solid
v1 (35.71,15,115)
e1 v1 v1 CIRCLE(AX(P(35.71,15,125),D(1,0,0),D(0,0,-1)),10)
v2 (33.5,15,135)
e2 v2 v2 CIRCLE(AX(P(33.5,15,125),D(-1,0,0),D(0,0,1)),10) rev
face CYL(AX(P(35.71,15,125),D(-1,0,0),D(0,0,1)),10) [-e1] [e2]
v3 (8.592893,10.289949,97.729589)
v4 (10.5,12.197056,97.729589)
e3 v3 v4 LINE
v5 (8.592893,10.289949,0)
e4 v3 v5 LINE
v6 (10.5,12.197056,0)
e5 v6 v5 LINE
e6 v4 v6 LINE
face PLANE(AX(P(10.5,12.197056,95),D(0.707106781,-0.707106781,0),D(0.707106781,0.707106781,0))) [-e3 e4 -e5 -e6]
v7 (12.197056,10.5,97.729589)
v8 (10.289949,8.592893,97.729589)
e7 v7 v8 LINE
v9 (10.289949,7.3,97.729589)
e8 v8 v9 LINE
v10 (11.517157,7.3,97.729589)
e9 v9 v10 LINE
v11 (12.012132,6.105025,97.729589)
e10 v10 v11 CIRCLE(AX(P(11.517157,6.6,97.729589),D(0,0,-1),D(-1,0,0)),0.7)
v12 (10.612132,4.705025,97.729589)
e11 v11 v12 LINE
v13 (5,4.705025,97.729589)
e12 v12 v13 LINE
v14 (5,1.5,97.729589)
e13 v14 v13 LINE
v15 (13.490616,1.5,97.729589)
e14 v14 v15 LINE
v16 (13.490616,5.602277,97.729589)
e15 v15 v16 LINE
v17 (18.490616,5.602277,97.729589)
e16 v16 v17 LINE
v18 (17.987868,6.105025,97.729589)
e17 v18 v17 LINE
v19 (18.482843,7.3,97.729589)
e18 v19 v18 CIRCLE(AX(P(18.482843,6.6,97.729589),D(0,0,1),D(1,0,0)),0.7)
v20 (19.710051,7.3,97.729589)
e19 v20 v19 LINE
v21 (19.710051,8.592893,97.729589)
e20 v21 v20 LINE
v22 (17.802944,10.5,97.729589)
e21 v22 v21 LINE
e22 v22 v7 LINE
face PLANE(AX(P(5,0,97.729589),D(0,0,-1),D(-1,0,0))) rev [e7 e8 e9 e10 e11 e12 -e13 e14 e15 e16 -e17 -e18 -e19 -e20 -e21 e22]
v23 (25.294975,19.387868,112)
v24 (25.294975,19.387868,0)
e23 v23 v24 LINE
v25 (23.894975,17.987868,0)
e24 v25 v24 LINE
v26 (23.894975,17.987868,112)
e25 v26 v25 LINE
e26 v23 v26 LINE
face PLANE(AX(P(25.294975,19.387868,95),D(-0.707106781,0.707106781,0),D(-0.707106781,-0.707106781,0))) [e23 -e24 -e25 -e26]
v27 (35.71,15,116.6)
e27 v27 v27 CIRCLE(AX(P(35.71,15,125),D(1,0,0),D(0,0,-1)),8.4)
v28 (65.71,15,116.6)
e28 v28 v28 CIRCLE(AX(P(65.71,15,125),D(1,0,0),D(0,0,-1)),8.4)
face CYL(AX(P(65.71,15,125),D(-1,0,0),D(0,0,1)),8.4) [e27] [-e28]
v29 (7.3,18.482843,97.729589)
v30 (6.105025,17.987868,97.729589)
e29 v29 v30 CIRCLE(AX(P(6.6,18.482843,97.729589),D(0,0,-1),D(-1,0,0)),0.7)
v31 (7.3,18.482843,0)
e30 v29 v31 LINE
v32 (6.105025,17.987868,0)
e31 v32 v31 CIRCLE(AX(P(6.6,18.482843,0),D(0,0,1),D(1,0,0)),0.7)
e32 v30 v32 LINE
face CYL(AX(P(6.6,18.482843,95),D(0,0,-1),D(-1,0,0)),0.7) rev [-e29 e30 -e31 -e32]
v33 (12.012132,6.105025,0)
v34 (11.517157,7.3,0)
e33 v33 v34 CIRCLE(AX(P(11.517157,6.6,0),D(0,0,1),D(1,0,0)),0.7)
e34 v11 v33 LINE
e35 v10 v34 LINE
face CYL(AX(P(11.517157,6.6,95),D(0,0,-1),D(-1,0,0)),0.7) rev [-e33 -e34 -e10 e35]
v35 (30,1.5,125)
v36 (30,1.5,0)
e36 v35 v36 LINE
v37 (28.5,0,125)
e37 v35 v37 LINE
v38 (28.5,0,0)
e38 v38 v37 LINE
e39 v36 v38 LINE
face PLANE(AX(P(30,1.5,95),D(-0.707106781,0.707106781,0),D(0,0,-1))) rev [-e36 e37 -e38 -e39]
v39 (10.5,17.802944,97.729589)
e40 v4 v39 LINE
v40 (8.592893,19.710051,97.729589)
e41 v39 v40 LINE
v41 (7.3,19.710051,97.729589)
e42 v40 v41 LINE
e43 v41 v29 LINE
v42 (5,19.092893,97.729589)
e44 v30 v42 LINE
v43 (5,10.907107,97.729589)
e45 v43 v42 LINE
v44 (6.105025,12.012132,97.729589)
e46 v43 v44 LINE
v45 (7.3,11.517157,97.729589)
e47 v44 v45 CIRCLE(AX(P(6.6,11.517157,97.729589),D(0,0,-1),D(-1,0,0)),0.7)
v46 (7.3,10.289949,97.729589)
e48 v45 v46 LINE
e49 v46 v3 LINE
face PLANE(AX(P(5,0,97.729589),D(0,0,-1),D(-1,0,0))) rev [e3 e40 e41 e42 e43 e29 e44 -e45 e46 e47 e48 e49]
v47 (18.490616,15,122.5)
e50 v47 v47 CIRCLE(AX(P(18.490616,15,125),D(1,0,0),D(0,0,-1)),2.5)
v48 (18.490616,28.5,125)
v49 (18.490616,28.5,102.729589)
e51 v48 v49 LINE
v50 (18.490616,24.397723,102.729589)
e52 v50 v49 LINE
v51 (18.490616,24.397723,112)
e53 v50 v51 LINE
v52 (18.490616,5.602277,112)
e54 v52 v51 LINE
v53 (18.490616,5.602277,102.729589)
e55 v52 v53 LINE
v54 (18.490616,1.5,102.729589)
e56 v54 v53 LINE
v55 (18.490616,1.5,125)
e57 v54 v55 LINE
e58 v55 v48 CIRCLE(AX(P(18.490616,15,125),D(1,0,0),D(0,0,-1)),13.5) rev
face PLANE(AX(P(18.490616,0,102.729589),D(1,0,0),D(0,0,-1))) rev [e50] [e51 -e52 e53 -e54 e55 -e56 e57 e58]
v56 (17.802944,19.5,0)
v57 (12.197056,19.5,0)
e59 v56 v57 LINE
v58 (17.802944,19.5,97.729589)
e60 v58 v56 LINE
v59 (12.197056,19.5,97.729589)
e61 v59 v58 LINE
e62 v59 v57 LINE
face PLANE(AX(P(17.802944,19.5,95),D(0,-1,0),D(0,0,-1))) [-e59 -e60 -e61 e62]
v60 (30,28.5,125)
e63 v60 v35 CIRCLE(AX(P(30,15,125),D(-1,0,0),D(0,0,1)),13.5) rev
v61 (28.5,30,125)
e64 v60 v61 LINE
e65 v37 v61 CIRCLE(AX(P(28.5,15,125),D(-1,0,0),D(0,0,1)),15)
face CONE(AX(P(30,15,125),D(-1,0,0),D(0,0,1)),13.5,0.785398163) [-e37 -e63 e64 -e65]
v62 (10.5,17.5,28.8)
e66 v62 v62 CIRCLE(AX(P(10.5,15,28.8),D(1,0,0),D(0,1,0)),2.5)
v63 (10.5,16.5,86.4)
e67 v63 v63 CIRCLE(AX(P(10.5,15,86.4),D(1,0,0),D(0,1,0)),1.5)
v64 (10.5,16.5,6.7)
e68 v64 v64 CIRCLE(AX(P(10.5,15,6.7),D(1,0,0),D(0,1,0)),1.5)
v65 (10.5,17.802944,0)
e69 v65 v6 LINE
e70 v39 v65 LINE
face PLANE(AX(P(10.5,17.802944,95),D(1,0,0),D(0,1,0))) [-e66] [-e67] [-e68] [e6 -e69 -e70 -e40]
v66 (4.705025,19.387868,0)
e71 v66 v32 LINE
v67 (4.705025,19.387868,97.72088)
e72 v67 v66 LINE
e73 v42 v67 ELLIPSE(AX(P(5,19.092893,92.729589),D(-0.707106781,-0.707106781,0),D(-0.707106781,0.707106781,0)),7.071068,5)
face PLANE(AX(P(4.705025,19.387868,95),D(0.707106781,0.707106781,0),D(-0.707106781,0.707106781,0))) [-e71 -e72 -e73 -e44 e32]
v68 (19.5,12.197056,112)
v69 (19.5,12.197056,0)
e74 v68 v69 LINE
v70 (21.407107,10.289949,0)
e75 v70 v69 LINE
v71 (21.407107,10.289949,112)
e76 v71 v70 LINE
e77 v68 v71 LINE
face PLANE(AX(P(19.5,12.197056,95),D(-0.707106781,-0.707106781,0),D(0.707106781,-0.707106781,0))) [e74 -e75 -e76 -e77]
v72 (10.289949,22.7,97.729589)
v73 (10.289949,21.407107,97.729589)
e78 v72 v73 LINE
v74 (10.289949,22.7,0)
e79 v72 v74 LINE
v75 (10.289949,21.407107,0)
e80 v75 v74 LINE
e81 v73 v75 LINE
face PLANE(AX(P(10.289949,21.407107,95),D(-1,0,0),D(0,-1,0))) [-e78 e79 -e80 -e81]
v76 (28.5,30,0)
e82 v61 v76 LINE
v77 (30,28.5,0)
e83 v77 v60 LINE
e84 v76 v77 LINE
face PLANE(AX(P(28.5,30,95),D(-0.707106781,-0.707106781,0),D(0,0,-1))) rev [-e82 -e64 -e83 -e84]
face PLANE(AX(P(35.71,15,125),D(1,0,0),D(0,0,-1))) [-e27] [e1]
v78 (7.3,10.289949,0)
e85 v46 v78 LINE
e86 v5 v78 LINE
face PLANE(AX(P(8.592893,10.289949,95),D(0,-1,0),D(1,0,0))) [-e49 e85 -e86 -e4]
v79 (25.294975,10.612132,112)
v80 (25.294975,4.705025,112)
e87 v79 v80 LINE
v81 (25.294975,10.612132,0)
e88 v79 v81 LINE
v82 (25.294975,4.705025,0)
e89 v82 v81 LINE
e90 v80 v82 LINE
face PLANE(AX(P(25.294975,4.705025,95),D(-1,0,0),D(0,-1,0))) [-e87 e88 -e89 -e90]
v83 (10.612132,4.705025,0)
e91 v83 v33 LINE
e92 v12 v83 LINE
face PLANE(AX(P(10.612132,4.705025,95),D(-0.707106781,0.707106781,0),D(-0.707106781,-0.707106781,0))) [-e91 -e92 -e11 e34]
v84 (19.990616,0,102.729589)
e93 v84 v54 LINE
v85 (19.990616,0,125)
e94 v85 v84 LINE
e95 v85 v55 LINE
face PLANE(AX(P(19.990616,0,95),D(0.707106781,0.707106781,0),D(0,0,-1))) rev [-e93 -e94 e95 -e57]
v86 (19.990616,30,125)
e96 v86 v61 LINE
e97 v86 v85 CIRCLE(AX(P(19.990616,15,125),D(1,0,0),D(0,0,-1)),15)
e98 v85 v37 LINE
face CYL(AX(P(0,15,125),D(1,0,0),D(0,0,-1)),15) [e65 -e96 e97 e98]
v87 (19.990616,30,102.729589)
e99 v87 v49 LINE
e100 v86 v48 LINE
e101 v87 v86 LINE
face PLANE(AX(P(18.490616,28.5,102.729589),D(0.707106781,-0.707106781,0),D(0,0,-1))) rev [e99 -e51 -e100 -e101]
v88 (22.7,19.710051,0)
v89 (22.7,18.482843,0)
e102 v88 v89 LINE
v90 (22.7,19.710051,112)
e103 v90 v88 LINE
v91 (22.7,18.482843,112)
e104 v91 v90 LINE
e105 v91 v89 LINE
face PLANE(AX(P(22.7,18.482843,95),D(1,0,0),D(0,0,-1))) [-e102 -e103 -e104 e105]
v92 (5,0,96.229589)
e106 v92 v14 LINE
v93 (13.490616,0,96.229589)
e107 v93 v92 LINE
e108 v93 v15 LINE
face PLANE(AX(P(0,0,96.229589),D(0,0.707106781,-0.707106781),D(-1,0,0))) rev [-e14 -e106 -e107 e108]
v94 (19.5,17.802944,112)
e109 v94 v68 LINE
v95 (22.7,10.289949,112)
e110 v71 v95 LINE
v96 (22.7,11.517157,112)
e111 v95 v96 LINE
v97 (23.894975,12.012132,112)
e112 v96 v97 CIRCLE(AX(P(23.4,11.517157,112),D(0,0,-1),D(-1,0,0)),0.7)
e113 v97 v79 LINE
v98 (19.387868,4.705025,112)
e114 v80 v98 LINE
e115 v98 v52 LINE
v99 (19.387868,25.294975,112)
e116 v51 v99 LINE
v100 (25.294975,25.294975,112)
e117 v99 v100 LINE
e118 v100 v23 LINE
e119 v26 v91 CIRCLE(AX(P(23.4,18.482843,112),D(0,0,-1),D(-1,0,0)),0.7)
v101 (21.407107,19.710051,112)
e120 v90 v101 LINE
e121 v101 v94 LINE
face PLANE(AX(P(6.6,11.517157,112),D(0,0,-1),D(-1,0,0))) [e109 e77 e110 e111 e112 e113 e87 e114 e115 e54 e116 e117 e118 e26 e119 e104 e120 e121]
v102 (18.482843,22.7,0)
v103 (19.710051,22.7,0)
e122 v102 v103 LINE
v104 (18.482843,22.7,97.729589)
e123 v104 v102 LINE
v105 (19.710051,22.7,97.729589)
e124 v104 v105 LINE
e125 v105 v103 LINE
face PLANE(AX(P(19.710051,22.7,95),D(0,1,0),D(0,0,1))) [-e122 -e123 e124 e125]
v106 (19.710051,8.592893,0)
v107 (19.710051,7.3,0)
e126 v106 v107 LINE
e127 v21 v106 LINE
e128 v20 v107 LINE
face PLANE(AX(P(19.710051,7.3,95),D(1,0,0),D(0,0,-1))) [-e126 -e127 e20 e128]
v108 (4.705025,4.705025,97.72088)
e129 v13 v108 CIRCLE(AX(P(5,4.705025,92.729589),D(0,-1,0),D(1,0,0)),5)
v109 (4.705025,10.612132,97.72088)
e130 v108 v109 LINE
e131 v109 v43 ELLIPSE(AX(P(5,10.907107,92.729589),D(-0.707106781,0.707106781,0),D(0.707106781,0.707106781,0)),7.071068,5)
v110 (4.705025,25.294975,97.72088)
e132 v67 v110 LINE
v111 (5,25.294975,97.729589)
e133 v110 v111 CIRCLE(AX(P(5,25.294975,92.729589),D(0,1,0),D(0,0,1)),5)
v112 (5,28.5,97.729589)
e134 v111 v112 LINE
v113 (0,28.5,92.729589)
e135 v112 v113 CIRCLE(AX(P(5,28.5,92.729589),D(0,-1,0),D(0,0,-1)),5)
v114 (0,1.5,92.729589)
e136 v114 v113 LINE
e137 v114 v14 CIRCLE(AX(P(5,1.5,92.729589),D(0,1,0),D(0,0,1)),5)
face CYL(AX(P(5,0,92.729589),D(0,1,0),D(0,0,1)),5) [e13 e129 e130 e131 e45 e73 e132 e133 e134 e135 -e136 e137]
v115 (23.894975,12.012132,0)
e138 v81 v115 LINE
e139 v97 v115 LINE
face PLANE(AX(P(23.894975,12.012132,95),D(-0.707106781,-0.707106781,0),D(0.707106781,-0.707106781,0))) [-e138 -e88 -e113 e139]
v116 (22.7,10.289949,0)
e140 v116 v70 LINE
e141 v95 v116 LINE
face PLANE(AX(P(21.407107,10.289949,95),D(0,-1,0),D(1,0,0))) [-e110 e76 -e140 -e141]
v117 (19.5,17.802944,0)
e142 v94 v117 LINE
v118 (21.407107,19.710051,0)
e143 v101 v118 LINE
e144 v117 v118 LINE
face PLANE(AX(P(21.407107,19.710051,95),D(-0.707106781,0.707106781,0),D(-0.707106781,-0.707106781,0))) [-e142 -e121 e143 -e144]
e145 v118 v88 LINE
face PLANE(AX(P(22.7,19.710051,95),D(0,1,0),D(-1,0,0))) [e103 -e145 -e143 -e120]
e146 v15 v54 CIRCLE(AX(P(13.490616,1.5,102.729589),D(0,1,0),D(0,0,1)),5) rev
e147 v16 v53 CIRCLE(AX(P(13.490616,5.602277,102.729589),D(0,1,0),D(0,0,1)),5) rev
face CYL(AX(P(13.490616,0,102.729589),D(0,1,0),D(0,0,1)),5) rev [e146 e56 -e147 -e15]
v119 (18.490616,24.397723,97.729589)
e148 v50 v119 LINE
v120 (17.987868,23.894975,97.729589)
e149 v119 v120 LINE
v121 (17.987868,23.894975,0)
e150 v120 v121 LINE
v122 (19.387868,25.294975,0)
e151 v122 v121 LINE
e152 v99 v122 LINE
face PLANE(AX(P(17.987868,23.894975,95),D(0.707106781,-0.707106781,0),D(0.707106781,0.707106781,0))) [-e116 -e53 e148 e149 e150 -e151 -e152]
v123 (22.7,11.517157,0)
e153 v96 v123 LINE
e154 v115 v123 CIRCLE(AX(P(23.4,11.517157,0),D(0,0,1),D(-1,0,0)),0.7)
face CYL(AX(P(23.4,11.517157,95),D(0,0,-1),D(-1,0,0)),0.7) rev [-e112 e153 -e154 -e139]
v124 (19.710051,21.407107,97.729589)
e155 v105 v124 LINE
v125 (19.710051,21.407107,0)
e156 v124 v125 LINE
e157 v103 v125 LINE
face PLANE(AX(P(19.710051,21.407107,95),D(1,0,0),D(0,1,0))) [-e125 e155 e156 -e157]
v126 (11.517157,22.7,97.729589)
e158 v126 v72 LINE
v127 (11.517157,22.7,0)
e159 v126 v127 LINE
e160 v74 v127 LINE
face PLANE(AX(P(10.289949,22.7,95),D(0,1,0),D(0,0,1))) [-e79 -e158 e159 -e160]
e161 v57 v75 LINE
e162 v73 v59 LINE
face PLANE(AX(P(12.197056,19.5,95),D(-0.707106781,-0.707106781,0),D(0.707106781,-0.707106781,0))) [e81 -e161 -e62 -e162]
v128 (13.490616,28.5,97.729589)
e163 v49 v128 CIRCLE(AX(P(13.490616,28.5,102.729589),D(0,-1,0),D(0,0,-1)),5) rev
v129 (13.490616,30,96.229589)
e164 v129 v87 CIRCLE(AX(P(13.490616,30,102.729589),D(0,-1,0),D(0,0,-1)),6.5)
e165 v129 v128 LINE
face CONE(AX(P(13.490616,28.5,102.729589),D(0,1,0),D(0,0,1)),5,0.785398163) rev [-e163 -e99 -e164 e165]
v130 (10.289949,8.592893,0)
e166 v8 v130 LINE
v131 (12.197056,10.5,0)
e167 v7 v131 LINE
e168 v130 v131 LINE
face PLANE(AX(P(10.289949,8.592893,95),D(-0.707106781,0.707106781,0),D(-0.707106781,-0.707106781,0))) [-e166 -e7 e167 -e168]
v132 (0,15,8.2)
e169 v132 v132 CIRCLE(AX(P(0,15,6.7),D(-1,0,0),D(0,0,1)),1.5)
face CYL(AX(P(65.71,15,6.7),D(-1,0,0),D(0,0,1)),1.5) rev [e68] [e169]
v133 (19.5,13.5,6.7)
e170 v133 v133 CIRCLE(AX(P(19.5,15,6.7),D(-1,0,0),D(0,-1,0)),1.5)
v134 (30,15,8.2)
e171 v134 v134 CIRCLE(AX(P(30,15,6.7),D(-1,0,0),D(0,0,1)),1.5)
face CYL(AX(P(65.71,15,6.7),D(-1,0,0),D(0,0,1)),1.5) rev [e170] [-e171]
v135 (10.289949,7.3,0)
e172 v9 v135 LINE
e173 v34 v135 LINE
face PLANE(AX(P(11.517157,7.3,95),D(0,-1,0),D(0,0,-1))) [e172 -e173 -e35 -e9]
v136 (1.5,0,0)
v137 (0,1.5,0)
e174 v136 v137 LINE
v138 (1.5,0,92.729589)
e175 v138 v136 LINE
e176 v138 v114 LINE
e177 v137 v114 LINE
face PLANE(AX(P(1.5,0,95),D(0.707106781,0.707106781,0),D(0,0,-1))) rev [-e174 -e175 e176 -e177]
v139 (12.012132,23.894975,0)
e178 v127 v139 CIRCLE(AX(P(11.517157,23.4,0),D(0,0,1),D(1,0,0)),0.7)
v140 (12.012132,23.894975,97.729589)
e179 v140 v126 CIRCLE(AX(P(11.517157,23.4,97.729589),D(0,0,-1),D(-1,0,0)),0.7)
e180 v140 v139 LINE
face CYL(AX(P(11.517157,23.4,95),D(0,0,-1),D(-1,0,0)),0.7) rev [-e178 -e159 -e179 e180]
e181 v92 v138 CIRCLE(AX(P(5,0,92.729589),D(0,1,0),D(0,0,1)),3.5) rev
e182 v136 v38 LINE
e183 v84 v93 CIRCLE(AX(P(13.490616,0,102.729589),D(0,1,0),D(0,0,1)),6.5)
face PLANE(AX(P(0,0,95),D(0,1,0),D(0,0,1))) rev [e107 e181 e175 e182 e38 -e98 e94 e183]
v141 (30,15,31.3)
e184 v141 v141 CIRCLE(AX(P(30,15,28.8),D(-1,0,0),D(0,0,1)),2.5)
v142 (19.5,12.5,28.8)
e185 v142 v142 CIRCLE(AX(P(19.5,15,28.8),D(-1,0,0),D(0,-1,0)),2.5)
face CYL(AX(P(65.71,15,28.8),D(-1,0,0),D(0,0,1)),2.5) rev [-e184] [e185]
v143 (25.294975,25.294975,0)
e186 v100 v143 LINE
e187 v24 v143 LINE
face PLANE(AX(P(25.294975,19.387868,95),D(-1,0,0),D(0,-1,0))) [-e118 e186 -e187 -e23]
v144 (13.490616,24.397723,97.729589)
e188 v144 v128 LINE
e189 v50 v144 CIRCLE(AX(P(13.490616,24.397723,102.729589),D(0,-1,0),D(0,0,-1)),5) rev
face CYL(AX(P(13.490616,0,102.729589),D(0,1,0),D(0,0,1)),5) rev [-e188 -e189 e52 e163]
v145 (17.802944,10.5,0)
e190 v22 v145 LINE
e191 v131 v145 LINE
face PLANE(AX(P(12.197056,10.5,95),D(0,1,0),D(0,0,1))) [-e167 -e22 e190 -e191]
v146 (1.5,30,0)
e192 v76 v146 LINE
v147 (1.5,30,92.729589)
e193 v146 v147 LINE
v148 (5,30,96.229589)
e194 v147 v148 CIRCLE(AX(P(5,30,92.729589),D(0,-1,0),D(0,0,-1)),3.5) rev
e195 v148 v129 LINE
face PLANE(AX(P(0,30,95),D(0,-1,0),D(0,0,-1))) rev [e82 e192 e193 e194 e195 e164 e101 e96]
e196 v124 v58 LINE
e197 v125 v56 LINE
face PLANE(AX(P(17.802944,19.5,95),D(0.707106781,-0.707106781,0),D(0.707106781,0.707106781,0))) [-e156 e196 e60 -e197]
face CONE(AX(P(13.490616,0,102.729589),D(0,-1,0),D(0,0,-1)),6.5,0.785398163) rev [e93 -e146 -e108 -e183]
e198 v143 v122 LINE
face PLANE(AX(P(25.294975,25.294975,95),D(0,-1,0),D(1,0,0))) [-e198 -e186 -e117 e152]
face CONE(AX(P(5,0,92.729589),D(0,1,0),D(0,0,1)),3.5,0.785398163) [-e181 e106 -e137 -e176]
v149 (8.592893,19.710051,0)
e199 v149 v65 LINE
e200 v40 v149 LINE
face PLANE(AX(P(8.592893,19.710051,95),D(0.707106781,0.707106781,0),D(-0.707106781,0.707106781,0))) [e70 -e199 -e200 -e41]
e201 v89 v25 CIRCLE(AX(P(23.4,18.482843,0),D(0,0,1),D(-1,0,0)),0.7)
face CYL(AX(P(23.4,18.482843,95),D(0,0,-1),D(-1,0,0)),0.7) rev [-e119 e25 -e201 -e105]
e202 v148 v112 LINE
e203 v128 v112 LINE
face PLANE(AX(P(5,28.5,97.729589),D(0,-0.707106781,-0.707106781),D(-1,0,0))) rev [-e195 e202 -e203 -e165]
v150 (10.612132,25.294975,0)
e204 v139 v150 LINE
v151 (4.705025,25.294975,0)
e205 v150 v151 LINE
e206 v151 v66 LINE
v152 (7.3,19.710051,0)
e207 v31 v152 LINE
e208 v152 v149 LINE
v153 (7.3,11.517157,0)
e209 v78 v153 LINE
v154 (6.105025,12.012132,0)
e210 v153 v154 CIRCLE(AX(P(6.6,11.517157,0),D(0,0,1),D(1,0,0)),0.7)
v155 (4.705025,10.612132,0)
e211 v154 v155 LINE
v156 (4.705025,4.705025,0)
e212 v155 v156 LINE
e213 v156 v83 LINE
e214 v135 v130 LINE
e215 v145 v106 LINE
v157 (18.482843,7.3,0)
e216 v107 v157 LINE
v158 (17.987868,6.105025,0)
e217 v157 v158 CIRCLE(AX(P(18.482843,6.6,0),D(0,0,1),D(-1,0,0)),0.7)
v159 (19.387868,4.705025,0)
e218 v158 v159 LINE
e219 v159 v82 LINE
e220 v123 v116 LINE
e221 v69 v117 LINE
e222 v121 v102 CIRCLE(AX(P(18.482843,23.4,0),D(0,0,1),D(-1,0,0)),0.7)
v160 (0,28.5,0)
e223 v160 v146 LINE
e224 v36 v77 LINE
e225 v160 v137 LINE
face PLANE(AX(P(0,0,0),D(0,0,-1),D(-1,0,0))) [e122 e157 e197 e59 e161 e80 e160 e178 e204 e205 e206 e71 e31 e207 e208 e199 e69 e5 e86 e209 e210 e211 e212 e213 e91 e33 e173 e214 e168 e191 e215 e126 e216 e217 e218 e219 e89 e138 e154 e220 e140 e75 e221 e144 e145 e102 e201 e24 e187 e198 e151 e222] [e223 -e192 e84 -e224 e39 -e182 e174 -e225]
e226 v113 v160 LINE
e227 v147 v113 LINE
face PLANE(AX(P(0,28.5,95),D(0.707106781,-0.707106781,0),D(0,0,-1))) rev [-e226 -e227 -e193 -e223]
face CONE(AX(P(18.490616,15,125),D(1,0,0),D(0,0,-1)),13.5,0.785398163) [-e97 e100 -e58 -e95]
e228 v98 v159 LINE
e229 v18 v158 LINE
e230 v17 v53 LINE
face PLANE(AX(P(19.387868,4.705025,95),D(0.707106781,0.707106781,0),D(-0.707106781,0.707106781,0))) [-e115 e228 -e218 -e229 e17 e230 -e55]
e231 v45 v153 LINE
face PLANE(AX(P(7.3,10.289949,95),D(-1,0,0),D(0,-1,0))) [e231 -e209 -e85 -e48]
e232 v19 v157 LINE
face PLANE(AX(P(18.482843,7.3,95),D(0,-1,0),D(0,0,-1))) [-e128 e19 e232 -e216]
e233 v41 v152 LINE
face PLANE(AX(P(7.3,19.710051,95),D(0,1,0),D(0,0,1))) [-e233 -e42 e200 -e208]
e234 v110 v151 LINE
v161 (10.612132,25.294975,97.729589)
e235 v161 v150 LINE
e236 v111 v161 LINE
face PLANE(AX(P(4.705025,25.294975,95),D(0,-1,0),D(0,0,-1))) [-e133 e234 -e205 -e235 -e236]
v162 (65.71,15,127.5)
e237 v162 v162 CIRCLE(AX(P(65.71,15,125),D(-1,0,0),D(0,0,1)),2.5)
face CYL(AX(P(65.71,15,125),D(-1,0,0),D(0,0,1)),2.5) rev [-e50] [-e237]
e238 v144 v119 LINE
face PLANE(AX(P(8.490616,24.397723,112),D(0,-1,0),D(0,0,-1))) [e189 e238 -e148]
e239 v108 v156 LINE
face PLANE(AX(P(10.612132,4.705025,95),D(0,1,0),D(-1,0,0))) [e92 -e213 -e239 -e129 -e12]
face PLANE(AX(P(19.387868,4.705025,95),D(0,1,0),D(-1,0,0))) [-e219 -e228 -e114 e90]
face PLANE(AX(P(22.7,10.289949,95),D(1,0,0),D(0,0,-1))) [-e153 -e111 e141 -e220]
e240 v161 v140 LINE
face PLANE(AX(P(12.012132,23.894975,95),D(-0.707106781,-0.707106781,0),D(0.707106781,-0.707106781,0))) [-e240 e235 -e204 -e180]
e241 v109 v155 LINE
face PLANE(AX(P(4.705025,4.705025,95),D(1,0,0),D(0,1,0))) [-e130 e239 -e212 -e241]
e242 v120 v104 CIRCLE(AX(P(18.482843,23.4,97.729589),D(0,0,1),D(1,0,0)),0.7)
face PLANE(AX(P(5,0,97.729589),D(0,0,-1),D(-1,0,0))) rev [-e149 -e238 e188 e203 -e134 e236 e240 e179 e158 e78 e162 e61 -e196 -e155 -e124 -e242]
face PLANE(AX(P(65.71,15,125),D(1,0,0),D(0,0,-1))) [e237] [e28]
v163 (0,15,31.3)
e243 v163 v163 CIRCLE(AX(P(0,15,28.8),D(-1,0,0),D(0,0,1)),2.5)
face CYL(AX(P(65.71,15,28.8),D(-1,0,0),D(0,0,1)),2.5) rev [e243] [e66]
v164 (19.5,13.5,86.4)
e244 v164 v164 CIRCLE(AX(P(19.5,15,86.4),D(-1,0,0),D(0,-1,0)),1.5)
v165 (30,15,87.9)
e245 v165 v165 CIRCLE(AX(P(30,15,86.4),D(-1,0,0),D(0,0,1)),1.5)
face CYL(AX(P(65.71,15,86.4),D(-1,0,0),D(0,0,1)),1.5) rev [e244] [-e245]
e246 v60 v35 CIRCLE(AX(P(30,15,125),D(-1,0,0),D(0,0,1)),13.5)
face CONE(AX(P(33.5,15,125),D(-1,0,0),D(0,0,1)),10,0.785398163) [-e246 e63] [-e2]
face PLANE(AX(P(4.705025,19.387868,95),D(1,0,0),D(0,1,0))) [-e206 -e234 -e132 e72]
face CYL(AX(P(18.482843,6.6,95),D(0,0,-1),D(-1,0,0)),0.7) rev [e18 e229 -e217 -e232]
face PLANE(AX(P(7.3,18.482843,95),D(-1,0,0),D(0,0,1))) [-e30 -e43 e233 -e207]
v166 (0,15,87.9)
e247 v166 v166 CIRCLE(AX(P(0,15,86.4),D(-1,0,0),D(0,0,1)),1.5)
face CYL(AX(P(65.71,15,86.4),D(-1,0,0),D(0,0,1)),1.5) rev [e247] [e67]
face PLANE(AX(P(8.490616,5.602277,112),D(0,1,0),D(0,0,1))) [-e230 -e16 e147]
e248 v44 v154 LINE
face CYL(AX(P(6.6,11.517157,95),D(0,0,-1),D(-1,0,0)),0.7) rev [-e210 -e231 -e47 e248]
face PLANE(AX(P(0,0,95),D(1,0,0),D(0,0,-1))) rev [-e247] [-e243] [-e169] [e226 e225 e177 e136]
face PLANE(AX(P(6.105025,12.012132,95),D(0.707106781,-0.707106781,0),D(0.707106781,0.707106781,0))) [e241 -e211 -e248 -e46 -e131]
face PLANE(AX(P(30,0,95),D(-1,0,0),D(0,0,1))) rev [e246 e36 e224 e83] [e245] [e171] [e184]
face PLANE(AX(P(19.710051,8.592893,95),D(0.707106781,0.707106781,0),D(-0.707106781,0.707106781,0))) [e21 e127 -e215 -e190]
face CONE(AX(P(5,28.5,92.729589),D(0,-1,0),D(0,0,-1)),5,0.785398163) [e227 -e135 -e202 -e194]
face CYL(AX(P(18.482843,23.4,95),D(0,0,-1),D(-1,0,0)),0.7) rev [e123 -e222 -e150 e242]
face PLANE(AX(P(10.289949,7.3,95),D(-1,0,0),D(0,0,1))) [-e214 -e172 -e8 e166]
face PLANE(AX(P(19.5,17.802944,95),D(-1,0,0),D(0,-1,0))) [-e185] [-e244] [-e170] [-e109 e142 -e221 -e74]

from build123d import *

# Parameters (mm, degrees)
SKETCH1_W               = 30
SKETCH1_H               = 30
BOSS_EXTRUDE3_DEPTH     = 95
BOSS_EXTRUDE4_DEPTH     = 30
CUT_EXTRUDE1_DEPTH      = 147.287388383
SKETCH5_R               = 10
BOSS_EXTRUDE5_DEPTH     = 5.71
SKETCH6_R               = 8.4
BOSS_EXTRUDE6_DEPTH     = 30
SKETCH8_R               = 1.5
SKETCH8_R_2             = 2.5
CUT_EXTRUDE2_DEPTH      = 158.536675412
CHAMFER1_SIZE           = 1.5
CHAMFER2_SIZE           = 3.5
CUT_EXTRUDE3_DEPTH      = 17
CUT_EXTRUDE4_DEPTH      = 10
CUT_EXTRUDE4_DEPTH_BACK = 2
SKETCH10_W              = 14.270411079
SKETCH10_H              = 4.897722898


with BuildPart() as part:
    # Sketch1 → Boss-Extrude3 (new body)
    with BuildSketch(Plane.XY):
        with Locations((15, 15)):
            Rectangle(SKETCH1_W, SKETCH1_H)
        with BuildLine():
            Line((17.802943725, 19.5), (12.197056275, 19.5))
            Line((12.197056275, 19.5), (10.289949494, 21.407106781))
            Line((10.289949494, 21.407106781), (10.289949494, 22.7))
            Line((10.289949494, 22.7), (11.517157288, 22.7))
            ThreePointArc((11.517157288, 22.7), (12.16387296, 23.132121597), (12.012132034, 23.894974747))
            Line((12.012132034, 23.894974747), (10.612132034, 25.294974747))
            Line((10.612132034, 25.294974747), (4.705025253, 25.294974747))
            Line((4.705025253, 25.294974747), (4.705025253, 19.387867966))
            Line((4.705025253, 19.387867966), (6.105025253, 17.987867966))
            ThreePointArc((6.105025253, 17.987867966), (6.867878403, 17.83612704), (7.3, 18.482842712))
            Line((7.3, 18.482842712), (7.3, 19.710050506))
            Line((7.3, 19.710050506), (8.592893219, 19.710050506))
            Line((8.592893219, 19.710050506), (10.5, 17.802943725))
            Line((10.5, 17.802943725), (10.5, 12.197056275))
            Line((10.5, 12.197056275), (8.592893219, 10.289949494))
            Line((8.592893219, 10.289949494), (7.3, 10.289949494))
            Line((7.3, 10.289949494), (7.3, 11.517157288))
            ThreePointArc((7.3, 11.517157288), (6.867878403, 12.16387296), (6.105025253, 12.012132034))
            Line((6.105025253, 12.012132034), (4.705025253, 10.612132034))
            Line((4.705025253, 10.612132034), (4.705025253, 4.705025253))
            Line((4.705025253, 4.705025253), (10.612132034, 4.705025253))
            Line((10.612132034, 4.705025253), (12.012132034, 6.105025253))
            ThreePointArc((12.012132034, 6.105025253), (12.16387296, 6.867878403), (11.517157288, 7.3))
            Line((11.517157288, 7.3), (10.289949494, 7.3))
            Line((10.289949494, 7.3), (10.289949494, 8.592893219))
            Line((10.289949494, 8.592893219), (12.197056275, 10.5))
            Line((12.197056275, 10.5), (17.802943725, 10.5))
            Line((17.802943725, 10.5), (19.710050506, 8.592893219))
            Line((19.710050506, 8.592893219), (19.710050506, 7.3))
            Line((19.710050506, 7.3), (18.482842712, 7.3))
            ThreePointArc((18.482842712, 7.3), (17.83612704, 6.867878403), (17.987867966, 6.105025253))
            Line((17.987867966, 6.105025253), (19.387867966, 4.705025253))
            Line((19.387867966, 4.705025253), (25.294974747, 4.705025253))
            Line((25.294974747, 4.705025253), (25.294974747, 10.612132034))
            Line((25.294974747, 10.612132034), (23.894974747, 12.012132034))
            ThreePointArc((23.894974747, 12.012132034), (23.132121597, 12.16387296), (22.7, 11.517157288))
            Line((22.7, 11.517157288), (22.7, 10.289949494))
            Line((22.7, 10.289949494), (21.407106781, 10.289949494))
            Line((21.407106781, 10.289949494), (19.5, 12.197056275))
            Line((19.5, 12.197056275), (19.5, 17.802943725))
            Line((19.5, 17.802943725), (21.407106781, 19.710050506))
            Line((21.407106781, 19.710050506), (22.7, 19.710050506))
            Line((22.7, 19.710050506), (22.7, 18.482842712))
            ThreePointArc((22.7, 18.482842712), (23.132121597, 17.83612704), (23.894974747, 17.987867966))
            Line((23.894974747, 17.987867966), (25.294974747, 19.387867966))
            Line((25.294974747, 19.387867966), (25.294974747, 25.294974747))
            Line((25.294974747, 25.294974747), (19.387867966, 25.294974747))
            Line((19.387867966, 25.294974747), (17.987867966, 23.894974747))
            ThreePointArc((17.987867966, 23.894974747), (17.83612704, 23.132121597), (18.482842712, 22.7))
            Line((18.482842712, 22.7), (19.710050506, 22.7))
            Line((19.710050506, 22.7), (19.710050506, 21.407106781))
            Line((19.710050506, 21.407106781), (17.802943725, 19.5))
        make_face(mode=Mode.SUBTRACT)
    extrude(amount=BOSS_EXTRUDE3_DEPTH)

    # Sketch3 → Boss-Extrude4 (add)
    with BuildSketch(Plane(origin=(30, 0, 0), x_dir=(0, 0, -1), z_dir=(1, 0, 0))):
        with BuildLine():
            Line((-125, 30), (-95, 30))
            Line((-95, 30), (-95, 0))
            Line((-95, 0), (-125, 0))
            ThreePointArc((-125, 0), (-140, 15), (-125, 30))
        make_face()
    extrude(amount=-BOSS_EXTRUDE4_DEPTH)

    # Sketch4 → Cut-Extrude1 (cut, through all)
    with BuildSketch(Plane(origin=(0, 30, 0), x_dir=(1, 0, 0), z_dir=(0, 1, 0))):
        with BuildLine():
            Line((5, -97.729588921), (13.490616116, -97.729588921))
            ThreePointArc((13.490616116, -97.729588921), (17.026150022, -99.194055015), (18.490616116, -102.729588921))
            Line((18.490616116, -102.729588921), (18.490616116, -140))
            Line((18.490616116, -140), (0, -140))
            Line((0, -140), (0, -92.729588921))
            ThreePointArc((0, -92.729588921), (1.464466094, -96.265122827), (5, -97.729588921))
        make_face()
    extrude(amount=-CUT_EXTRUDE1_DEPTH, mode=Mode.SUBTRACT)

    # Sketch5 → Boss-Extrude5 (add)
    with BuildSketch(Plane(origin=(30, 0, 0), x_dir=(0, 0, -1), z_dir=(1, 0, 0))):
        with Locations(Location((-125, 15, 0), (0, 0, 180))):
            Circle(SKETCH5_R)
    extrude(amount=BOSS_EXTRUDE5_DEPTH)

    # Sketch6 → Boss-Extrude6 (add)
    with BuildSketch(Plane(origin=(35.71, 0, 0), x_dir=(0, 0, -1), z_dir=(1, 0, 0))):
        with Locations((-125, 15)):
            Circle(SKETCH6_R)
    extrude(amount=BOSS_EXTRUDE6_DEPTH)

    # Sketch8 → Cut-Extrude2 (cut, through all)
    with BuildSketch(Plane.ZY):
        with Locations((6.7, 15)):
            Circle(SKETCH8_R)
        with Locations((86.4, 15)):
            Circle(SKETCH8_R)
        with Locations((28.8, 15)):
            Circle(SKETCH8_R_2)
        with Locations((125, 15)):
            Circle(SKETCH8_R_2)
    extrude(amount=-CUT_EXTRUDE2_DEPTH, mode=Mode.SUBTRACT)

    # Chamfer1
    chamfer1_edges = [part.edges().sort_by_distance(p)[0] for p in [
        (30, 15, 140),
        (18.490616116, 15, 140),
        (0, 30, 46.364794461),
        (0, 0, 46.364794461),
        (18.490616116, 30, 113.864794461),
        (17.026150022, 30, 99.194055015),
        (9.245308058, 30, 97.729588921),
        (1.464466094, 30, 96.265122827),
        (18.490616116, 0, 113.864794461),
        (1.464466094, 0, 96.265122827),
        (9.245308058, 0, 97.729588921),
        (17.026150022, 0, 99.194055015),
        (30, 30, 62.5),
        (30, 0, 62.5),
    ]]
    chamfer(chamfer1_edges, length=CHAMFER1_SIZE)

    # Chamfer2
    chamfer2_edges = [part.edges().sort_by_distance(p)[0] for p in [
        (30, 15, 115),
    ]]
    chamfer(chamfer2_edges, length=CHAMFER2_SIZE - 0.0001)  # a hair under: the kernel refuses the full size

    # Sketch9 → Cut-Extrude3 (cut)
    with BuildSketch(Plane(origin=(0, 0, 95), x_dir=(-1, 0, 0), z_dir=(0, 0, -1))):
        with BuildLine():
            Line((-10.612132034, 4.705025253), (-4.705025253, 4.705025253))
            Line((-4.705025253, 4.705025253), (-4.705025253, 10.612132034))
            Line((-4.705025253, 10.612132034), (-6.105025253, 12.012132034))
            ThreePointArc((-6.105025253, 12.012132034), (-6.867878403, 12.16387296), (-7.3, 11.517157288))
            Line((-7.3, 11.517157288), (-7.3, 10.289949494))
            Line((-7.3, 10.289949494), (-8.592893219, 10.289949494))
            Line((-8.592893219, 10.289949494), (-10.5, 12.197056275))
            Line((-10.5, 12.197056275), (-10.5, 17.802943725))
            Line((-10.5, 17.802943725), (-8.592893219, 19.710050506))
            Line((-8.592893219, 19.710050506), (-7.3, 19.710050506))
            Line((-7.3, 19.710050506), (-7.3, 18.482842712))
            ThreePointArc((-7.3, 18.482842712), (-6.867878403, 17.83612704), (-6.105025253, 17.987867966))
            Line((-6.105025253, 17.987867966), (-4.705025253, 19.387867966))
            Line((-4.705025253, 19.387867966), (-4.705025253, 25.294974747))
            Line((-4.705025253, 25.294974747), (-10.612132034, 25.294974747))
            Line((-10.612132034, 25.294974747), (-12.012132034, 23.894974747))
            ThreePointArc((-12.012132034, 23.894974747), (-12.16387296, 23.132121597), (-11.517157288, 22.7))
            Line((-11.517157288, 22.7), (-10.289949494, 22.7))
            Line((-10.289949494, 22.7), (-10.289949494, 21.407106781))
            Line((-10.289949494, 21.407106781), (-12.197056275, 19.5))
            Line((-12.197056275, 19.5), (-17.802943725, 19.5))
            Line((-17.802943725, 19.5), (-19.710050506, 21.407106781))
            Line((-19.710050506, 21.407106781), (-19.710050506, 22.7))
            Line((-19.710050506, 22.7), (-18.482842712, 22.7))
            ThreePointArc((-18.482842712, 22.7), (-17.83612704, 23.132121597), (-17.987867966, 23.894974747))
            Line((-17.987867966, 23.894974747), (-19.387867966, 25.294974747))
            Line((-19.387867966, 25.294974747), (-25.294974747, 25.294974747))
            Line((-25.294974747, 25.294974747), (-25.294974747, 19.387867966))
            Line((-25.294974747, 19.387867966), (-23.894974747, 17.987867966))
            ThreePointArc((-23.894974747, 17.987867966), (-23.132121597, 17.83612704), (-22.7, 18.482842712))
            Line((-22.7, 18.482842712), (-22.7, 19.710050506))
            Line((-22.7, 19.710050506), (-21.407106781, 19.710050506))
            Line((-21.407106781, 19.710050506), (-19.5, 17.802943725))
            Line((-19.5, 17.802943725), (-19.5, 12.197056275))
            Line((-19.5, 12.197056275), (-21.407106781, 10.289949494))
            Line((-21.407106781, 10.289949494), (-22.7, 10.289949494))
            Line((-22.7, 10.289949494), (-22.7, 11.517157288))
            ThreePointArc((-22.7, 11.517157288), (-23.132121597, 12.16387296), (-23.894974747, 12.012132034))
            Line((-23.894974747, 12.012132034), (-25.294974747, 10.612132034))
            Line((-25.294974747, 10.612132034), (-25.294974747, 4.705025253))
            Line((-25.294974747, 4.705025253), (-19.387867966, 4.705025253))
            Line((-19.387867966, 4.705025253), (-17.987867966, 6.105025253))
            ThreePointArc((-17.987867966, 6.105025253), (-17.83612704, 6.867878403), (-18.482842712, 7.3))
            Line((-18.482842712, 7.3), (-19.710050506, 7.3))
            Line((-19.710050506, 7.3), (-19.710050506, 8.592893219))
            Line((-19.710050506, 8.592893219), (-17.802943725, 10.5))
            Line((-17.802943725, 10.5), (-12.197056275, 10.5))
            Line((-12.197056275, 10.5), (-10.289949494, 8.592893219))
            Line((-10.289949494, 8.592893219), (-10.289949494, 7.3))
            Line((-10.289949494, 7.3), (-11.517157288, 7.3))
            ThreePointArc((-11.517157288, 7.3), (-12.16387296, 6.867878403), (-12.012132034, 6.105025253))
            Line((-12.012132034, 6.105025253), (-10.612132034, 4.705025253))
        make_face()
    extrude(amount=-CUT_EXTRUDE3_DEPTH, mode=Mode.SUBTRACT)

    # Sketch10 → Cut-Extrude4 (cut, two sides: drawn at the far end of the back side and taken through both)
    with BuildSketch(Plane.ZY.offset(-18.490616116).offset(-CUT_EXTRUDE4_DEPTH_BACK)):
        with Locations((104.864794461, 21.948861449)):
            Rectangle(SKETCH10_W, SKETCH10_H)
        with Locations((104.864794461, 8.051138551)):
            Rectangle(SKETCH10_W, SKETCH10_H)
    extrude(amount=CUT_EXTRUDE4_DEPTH + CUT_EXTRUDE4_DEPTH_BACK, mode=Mode.SUBTRACT)


solid = part.part
